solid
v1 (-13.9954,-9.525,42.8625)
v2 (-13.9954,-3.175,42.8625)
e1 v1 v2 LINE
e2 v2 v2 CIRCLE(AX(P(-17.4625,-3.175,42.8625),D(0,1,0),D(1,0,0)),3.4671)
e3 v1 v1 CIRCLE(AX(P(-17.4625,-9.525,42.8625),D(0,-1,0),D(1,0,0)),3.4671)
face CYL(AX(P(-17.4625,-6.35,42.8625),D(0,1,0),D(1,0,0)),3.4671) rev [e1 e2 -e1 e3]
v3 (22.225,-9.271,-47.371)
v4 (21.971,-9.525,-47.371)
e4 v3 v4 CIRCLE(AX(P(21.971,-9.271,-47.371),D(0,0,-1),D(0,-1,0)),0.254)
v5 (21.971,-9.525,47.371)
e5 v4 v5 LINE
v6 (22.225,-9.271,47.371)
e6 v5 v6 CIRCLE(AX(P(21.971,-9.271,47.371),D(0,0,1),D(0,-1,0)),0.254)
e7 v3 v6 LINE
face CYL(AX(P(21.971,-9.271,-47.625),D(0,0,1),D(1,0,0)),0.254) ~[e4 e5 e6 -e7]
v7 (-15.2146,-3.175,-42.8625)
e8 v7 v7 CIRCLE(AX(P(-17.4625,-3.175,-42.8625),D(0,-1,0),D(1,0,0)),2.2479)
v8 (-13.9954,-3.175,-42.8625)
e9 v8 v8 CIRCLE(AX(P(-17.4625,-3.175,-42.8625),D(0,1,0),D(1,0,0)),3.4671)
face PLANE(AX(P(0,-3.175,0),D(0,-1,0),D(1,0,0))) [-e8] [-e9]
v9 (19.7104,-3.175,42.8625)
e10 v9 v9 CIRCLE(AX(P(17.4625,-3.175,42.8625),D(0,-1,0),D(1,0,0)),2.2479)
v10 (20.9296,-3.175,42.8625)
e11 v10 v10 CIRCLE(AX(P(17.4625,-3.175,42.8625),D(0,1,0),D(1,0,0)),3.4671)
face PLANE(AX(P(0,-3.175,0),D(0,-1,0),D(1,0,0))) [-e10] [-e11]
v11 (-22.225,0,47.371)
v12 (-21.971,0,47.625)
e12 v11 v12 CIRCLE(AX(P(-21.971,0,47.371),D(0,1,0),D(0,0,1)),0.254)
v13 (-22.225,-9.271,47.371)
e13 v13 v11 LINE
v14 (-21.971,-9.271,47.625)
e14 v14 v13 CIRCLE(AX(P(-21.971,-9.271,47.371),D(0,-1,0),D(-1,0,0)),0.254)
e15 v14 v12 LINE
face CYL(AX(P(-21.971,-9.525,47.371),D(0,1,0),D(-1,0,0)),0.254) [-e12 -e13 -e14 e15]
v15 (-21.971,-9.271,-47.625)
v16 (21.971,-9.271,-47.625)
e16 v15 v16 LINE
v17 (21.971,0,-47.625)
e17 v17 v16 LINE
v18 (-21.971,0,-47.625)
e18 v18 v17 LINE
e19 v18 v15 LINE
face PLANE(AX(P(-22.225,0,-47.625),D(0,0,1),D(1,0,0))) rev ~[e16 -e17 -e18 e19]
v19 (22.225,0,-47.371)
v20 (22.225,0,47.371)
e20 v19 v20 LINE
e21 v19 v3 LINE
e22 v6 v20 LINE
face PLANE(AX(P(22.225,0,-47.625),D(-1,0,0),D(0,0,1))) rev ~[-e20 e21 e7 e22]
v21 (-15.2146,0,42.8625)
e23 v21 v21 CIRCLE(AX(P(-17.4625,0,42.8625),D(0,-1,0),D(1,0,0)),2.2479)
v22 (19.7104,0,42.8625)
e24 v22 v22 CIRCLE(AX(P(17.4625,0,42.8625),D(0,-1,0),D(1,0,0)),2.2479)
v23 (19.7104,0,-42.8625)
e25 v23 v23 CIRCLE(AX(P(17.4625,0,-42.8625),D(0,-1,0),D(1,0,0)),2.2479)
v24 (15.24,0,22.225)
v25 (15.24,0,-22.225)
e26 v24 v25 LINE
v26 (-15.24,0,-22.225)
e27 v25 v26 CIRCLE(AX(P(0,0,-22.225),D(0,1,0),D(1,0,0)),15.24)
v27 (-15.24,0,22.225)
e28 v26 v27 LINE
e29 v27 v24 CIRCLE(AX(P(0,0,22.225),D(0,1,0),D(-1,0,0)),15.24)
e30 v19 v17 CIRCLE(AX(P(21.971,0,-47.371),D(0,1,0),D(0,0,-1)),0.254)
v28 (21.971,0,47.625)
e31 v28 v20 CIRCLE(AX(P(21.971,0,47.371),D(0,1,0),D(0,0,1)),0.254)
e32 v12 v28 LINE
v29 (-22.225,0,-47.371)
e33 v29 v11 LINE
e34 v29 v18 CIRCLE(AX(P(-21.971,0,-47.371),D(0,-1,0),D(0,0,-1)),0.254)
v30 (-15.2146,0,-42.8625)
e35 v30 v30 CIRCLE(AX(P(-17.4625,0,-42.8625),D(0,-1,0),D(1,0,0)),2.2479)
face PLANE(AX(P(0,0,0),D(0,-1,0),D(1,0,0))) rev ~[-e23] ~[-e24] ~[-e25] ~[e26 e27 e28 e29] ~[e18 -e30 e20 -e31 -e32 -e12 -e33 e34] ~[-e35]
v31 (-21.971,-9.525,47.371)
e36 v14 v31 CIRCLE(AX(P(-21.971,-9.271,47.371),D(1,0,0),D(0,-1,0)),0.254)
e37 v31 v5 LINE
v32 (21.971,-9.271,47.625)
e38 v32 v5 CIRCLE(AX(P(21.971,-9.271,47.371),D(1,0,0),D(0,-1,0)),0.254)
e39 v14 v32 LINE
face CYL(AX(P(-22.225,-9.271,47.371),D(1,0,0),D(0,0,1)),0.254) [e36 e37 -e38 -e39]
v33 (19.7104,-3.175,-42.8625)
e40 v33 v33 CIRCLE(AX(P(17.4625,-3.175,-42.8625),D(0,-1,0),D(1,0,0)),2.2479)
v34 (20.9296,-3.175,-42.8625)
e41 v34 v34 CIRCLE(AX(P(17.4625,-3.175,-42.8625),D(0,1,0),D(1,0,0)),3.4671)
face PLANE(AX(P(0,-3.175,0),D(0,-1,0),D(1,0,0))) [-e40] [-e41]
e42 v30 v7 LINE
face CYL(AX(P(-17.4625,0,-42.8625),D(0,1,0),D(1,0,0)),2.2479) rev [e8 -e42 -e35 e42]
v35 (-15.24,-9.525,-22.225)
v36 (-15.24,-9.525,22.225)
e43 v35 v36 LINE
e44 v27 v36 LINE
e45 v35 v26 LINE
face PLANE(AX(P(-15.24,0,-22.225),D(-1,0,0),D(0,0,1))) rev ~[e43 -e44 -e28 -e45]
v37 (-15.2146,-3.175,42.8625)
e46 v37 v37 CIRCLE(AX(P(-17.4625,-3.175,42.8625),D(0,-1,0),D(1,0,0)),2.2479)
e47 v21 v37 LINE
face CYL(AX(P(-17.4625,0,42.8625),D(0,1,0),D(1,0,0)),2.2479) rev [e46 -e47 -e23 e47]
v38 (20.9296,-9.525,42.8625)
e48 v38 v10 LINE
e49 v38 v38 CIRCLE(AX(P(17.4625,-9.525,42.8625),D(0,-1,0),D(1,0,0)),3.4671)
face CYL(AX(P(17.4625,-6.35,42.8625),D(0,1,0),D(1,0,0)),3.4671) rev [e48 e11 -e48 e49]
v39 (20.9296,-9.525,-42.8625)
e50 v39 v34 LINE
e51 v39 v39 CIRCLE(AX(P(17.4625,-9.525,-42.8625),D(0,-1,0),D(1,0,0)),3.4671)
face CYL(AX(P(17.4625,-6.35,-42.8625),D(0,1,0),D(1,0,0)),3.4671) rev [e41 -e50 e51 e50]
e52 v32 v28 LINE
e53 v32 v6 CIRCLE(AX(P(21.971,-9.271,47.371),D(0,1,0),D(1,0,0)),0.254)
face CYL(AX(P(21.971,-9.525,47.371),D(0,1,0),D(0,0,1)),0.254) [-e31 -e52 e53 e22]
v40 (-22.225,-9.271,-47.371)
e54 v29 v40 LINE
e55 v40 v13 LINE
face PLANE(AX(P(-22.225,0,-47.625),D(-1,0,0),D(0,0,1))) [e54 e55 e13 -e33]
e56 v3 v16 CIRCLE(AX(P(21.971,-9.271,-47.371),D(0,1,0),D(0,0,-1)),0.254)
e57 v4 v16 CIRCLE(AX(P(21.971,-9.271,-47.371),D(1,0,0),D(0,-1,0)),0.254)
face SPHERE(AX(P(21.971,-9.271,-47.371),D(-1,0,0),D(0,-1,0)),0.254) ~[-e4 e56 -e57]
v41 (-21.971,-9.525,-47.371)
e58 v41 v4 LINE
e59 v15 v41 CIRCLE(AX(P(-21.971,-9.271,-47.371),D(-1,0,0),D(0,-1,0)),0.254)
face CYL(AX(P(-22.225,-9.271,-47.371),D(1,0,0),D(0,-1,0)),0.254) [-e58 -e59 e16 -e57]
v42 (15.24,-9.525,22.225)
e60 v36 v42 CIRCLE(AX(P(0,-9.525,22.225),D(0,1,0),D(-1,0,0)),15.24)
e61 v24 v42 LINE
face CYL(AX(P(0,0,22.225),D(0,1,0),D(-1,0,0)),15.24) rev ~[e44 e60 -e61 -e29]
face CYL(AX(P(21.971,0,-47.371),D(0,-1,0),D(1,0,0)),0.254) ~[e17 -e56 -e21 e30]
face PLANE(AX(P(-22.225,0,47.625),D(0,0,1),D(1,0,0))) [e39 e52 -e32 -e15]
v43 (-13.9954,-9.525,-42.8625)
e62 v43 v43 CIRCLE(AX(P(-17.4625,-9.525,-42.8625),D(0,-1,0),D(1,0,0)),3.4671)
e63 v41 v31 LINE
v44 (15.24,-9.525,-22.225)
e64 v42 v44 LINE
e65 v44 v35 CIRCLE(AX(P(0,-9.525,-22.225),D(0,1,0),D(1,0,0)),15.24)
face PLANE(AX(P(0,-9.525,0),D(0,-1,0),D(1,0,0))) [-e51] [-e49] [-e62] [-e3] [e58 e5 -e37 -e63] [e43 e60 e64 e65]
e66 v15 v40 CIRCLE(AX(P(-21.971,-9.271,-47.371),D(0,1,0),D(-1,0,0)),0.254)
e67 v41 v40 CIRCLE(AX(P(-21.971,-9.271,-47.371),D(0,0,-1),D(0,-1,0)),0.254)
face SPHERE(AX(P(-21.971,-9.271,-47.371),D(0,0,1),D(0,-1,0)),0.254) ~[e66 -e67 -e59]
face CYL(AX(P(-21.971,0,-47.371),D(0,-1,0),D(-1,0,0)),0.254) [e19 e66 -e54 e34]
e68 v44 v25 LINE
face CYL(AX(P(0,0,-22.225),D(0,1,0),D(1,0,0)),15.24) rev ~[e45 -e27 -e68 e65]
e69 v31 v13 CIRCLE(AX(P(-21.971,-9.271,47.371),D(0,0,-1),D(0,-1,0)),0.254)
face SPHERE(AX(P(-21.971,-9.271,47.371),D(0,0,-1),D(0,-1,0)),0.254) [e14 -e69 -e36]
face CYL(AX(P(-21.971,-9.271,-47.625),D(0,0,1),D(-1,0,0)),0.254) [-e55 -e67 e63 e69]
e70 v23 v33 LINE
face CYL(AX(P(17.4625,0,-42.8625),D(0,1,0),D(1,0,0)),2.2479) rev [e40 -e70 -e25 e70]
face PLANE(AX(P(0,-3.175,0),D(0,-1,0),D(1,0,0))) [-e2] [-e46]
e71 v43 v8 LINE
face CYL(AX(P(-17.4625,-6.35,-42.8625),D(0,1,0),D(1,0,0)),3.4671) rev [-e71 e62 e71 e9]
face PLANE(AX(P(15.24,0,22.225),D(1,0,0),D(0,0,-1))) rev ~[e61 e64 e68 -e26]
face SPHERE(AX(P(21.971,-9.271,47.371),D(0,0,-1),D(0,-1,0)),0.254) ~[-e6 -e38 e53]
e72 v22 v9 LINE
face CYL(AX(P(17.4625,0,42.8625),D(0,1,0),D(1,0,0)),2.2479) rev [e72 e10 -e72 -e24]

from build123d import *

# Parameters (mm, degrees)
F0_W      = 44.45
F0_H      = 95.25
F0_R      = 3.4671
F1_DEPTH  = 6.35
F0_R_2    = 2.2479
F1_FACE_W = 44.45
F1_FACE_H = 95.25
F1_FACE_R = 3.4671
F2_DEPTH  = 3.175
F3_R      = 0.254


# Not quite as in the source:
# - a feature names something its author has since deleted; it is built from what else it names


with BuildPart() as f1:
    # F0 (on Front) → F1 (new body)
    with BuildSketch(Plane.XZ):
        Rectangle(F0_W, F0_H)
        with Locations((-17.4625, -42.8625)):
            Circle(F0_R, mode=Mode.SUBTRACT)
        with Locations((17.4625, -42.8625)):
            Circle(F0_R, mode=Mode.SUBTRACT)
        with Locations((-17.4625, 42.8625)):
            Circle(F0_R, mode=Mode.SUBTRACT)
        with BuildLine():
            ThreePointArc((-15.24, 22.225), (0, 37.465), (15.24, 22.225))
            Line((15.24, 22.225), (15.24, -22.225))
            ThreePointArc((15.24, -22.225), (0, -37.465), (-15.24, -22.225))
            Line((-15.24, -22.225), (-15.24, 22.225))
        make_face(mode=Mode.SUBTRACT)
        with Locations((17.4625, 42.8625)):
            Circle(F0_R, mode=Mode.SUBTRACT)
    extrude(amount=F1_DEPTH)

    # F0 (on Front) + F1_face (on face) → F2 (join)
    with BuildSketch(Plane.XZ):
        Rectangle(F0_W, F0_H)
        with Locations((-17.4625, -42.8625)):
            Circle(F0_R, mode=Mode.SUBTRACT)
        with Locations((17.4625, -42.8625)):
            Circle(F0_R, mode=Mode.SUBTRACT)
        with Locations((-17.4625, 42.8625)):
            Circle(F0_R, mode=Mode.SUBTRACT)
        with BuildLine():
            ThreePointArc((-15.24, 22.225), (0, 37.465), (15.24, 22.225))
            Line((15.24, 22.225), (15.24, -22.225))
            ThreePointArc((15.24, -22.225), (0, -37.465), (-15.24, -22.225))
            Line((-15.24, -22.225), (-15.24, 22.225))
        make_face(mode=Mode.SUBTRACT)
        with Locations((17.4625, 42.8625)):
            Circle(F0_R, mode=Mode.SUBTRACT)
        with Locations((-17.4625, 42.8625)):
            Circle(F0_R)
        with Locations((-17.4625, 42.8625)):
            Circle(F0_R_2, mode=Mode.SUBTRACT)
        with Locations((17.4625, 42.8625)):
            Circle(F0_R)
        with Locations((17.4625, 42.8625)):
            Circle(F0_R_2, mode=Mode.SUBTRACT)
        with Locations((-17.4625, -42.8625)):
            Circle(F0_R)
        with Locations((-17.4625, -42.8625)):
            Circle(F0_R_2, mode=Mode.SUBTRACT)
        with Locations((17.4625, -42.8625)):
            Circle(F0_R)
        with Locations((17.4625, -42.8625)):
            Circle(F0_R_2, mode=Mode.SUBTRACT)
    with BuildSketch(Plane.XZ.offset(6.35)):
        Rectangle(F1_FACE_W, F1_FACE_H)
        with Locations((-17.4625, -42.8625)):
            Circle(F1_FACE_R, mode=Mode.SUBTRACT)
        with Locations((17.4625, -42.8625)):
            Circle(F1_FACE_R, mode=Mode.SUBTRACT)
        with Locations((-17.4625, 42.8625)):
            Circle(F1_FACE_R, mode=Mode.SUBTRACT)
        with BuildLine():
            Line((-15.24, -22.225), (-15.24, 22.225))
            ThreePointArc((-15.24, 22.225), (0, 37.465), (15.24, 22.225))
            Line((15.24, 22.225), (15.24, -22.225))
            ThreePointArc((15.24, -22.225), (0, -37.465), (-15.24, -22.225))
        make_face(mode=Mode.SUBTRACT)
        with Locations((17.4625, 42.8625)):
            Circle(F1_FACE_R, mode=Mode.SUBTRACT)
    extrude(amount=F2_DEPTH)

    # F3
    f3_edges = [f1.edges().sort_by_distance(p)[0] for p in [
        (-22.225, -9.525, 0),
        (0, -9.525, -47.625),
        (22.225, -9.525, 0),
        (0, -9.525, 47.625),
        (-22.225, -4.7625, 47.625),
        (22.225, -4.7625, 47.625),
        (22.225, -4.7625, -47.625),
        (-22.225, -4.7625, -47.625),
    ]]
    fillet(f3_edges, radius=F3_R)


solid = f1.part
